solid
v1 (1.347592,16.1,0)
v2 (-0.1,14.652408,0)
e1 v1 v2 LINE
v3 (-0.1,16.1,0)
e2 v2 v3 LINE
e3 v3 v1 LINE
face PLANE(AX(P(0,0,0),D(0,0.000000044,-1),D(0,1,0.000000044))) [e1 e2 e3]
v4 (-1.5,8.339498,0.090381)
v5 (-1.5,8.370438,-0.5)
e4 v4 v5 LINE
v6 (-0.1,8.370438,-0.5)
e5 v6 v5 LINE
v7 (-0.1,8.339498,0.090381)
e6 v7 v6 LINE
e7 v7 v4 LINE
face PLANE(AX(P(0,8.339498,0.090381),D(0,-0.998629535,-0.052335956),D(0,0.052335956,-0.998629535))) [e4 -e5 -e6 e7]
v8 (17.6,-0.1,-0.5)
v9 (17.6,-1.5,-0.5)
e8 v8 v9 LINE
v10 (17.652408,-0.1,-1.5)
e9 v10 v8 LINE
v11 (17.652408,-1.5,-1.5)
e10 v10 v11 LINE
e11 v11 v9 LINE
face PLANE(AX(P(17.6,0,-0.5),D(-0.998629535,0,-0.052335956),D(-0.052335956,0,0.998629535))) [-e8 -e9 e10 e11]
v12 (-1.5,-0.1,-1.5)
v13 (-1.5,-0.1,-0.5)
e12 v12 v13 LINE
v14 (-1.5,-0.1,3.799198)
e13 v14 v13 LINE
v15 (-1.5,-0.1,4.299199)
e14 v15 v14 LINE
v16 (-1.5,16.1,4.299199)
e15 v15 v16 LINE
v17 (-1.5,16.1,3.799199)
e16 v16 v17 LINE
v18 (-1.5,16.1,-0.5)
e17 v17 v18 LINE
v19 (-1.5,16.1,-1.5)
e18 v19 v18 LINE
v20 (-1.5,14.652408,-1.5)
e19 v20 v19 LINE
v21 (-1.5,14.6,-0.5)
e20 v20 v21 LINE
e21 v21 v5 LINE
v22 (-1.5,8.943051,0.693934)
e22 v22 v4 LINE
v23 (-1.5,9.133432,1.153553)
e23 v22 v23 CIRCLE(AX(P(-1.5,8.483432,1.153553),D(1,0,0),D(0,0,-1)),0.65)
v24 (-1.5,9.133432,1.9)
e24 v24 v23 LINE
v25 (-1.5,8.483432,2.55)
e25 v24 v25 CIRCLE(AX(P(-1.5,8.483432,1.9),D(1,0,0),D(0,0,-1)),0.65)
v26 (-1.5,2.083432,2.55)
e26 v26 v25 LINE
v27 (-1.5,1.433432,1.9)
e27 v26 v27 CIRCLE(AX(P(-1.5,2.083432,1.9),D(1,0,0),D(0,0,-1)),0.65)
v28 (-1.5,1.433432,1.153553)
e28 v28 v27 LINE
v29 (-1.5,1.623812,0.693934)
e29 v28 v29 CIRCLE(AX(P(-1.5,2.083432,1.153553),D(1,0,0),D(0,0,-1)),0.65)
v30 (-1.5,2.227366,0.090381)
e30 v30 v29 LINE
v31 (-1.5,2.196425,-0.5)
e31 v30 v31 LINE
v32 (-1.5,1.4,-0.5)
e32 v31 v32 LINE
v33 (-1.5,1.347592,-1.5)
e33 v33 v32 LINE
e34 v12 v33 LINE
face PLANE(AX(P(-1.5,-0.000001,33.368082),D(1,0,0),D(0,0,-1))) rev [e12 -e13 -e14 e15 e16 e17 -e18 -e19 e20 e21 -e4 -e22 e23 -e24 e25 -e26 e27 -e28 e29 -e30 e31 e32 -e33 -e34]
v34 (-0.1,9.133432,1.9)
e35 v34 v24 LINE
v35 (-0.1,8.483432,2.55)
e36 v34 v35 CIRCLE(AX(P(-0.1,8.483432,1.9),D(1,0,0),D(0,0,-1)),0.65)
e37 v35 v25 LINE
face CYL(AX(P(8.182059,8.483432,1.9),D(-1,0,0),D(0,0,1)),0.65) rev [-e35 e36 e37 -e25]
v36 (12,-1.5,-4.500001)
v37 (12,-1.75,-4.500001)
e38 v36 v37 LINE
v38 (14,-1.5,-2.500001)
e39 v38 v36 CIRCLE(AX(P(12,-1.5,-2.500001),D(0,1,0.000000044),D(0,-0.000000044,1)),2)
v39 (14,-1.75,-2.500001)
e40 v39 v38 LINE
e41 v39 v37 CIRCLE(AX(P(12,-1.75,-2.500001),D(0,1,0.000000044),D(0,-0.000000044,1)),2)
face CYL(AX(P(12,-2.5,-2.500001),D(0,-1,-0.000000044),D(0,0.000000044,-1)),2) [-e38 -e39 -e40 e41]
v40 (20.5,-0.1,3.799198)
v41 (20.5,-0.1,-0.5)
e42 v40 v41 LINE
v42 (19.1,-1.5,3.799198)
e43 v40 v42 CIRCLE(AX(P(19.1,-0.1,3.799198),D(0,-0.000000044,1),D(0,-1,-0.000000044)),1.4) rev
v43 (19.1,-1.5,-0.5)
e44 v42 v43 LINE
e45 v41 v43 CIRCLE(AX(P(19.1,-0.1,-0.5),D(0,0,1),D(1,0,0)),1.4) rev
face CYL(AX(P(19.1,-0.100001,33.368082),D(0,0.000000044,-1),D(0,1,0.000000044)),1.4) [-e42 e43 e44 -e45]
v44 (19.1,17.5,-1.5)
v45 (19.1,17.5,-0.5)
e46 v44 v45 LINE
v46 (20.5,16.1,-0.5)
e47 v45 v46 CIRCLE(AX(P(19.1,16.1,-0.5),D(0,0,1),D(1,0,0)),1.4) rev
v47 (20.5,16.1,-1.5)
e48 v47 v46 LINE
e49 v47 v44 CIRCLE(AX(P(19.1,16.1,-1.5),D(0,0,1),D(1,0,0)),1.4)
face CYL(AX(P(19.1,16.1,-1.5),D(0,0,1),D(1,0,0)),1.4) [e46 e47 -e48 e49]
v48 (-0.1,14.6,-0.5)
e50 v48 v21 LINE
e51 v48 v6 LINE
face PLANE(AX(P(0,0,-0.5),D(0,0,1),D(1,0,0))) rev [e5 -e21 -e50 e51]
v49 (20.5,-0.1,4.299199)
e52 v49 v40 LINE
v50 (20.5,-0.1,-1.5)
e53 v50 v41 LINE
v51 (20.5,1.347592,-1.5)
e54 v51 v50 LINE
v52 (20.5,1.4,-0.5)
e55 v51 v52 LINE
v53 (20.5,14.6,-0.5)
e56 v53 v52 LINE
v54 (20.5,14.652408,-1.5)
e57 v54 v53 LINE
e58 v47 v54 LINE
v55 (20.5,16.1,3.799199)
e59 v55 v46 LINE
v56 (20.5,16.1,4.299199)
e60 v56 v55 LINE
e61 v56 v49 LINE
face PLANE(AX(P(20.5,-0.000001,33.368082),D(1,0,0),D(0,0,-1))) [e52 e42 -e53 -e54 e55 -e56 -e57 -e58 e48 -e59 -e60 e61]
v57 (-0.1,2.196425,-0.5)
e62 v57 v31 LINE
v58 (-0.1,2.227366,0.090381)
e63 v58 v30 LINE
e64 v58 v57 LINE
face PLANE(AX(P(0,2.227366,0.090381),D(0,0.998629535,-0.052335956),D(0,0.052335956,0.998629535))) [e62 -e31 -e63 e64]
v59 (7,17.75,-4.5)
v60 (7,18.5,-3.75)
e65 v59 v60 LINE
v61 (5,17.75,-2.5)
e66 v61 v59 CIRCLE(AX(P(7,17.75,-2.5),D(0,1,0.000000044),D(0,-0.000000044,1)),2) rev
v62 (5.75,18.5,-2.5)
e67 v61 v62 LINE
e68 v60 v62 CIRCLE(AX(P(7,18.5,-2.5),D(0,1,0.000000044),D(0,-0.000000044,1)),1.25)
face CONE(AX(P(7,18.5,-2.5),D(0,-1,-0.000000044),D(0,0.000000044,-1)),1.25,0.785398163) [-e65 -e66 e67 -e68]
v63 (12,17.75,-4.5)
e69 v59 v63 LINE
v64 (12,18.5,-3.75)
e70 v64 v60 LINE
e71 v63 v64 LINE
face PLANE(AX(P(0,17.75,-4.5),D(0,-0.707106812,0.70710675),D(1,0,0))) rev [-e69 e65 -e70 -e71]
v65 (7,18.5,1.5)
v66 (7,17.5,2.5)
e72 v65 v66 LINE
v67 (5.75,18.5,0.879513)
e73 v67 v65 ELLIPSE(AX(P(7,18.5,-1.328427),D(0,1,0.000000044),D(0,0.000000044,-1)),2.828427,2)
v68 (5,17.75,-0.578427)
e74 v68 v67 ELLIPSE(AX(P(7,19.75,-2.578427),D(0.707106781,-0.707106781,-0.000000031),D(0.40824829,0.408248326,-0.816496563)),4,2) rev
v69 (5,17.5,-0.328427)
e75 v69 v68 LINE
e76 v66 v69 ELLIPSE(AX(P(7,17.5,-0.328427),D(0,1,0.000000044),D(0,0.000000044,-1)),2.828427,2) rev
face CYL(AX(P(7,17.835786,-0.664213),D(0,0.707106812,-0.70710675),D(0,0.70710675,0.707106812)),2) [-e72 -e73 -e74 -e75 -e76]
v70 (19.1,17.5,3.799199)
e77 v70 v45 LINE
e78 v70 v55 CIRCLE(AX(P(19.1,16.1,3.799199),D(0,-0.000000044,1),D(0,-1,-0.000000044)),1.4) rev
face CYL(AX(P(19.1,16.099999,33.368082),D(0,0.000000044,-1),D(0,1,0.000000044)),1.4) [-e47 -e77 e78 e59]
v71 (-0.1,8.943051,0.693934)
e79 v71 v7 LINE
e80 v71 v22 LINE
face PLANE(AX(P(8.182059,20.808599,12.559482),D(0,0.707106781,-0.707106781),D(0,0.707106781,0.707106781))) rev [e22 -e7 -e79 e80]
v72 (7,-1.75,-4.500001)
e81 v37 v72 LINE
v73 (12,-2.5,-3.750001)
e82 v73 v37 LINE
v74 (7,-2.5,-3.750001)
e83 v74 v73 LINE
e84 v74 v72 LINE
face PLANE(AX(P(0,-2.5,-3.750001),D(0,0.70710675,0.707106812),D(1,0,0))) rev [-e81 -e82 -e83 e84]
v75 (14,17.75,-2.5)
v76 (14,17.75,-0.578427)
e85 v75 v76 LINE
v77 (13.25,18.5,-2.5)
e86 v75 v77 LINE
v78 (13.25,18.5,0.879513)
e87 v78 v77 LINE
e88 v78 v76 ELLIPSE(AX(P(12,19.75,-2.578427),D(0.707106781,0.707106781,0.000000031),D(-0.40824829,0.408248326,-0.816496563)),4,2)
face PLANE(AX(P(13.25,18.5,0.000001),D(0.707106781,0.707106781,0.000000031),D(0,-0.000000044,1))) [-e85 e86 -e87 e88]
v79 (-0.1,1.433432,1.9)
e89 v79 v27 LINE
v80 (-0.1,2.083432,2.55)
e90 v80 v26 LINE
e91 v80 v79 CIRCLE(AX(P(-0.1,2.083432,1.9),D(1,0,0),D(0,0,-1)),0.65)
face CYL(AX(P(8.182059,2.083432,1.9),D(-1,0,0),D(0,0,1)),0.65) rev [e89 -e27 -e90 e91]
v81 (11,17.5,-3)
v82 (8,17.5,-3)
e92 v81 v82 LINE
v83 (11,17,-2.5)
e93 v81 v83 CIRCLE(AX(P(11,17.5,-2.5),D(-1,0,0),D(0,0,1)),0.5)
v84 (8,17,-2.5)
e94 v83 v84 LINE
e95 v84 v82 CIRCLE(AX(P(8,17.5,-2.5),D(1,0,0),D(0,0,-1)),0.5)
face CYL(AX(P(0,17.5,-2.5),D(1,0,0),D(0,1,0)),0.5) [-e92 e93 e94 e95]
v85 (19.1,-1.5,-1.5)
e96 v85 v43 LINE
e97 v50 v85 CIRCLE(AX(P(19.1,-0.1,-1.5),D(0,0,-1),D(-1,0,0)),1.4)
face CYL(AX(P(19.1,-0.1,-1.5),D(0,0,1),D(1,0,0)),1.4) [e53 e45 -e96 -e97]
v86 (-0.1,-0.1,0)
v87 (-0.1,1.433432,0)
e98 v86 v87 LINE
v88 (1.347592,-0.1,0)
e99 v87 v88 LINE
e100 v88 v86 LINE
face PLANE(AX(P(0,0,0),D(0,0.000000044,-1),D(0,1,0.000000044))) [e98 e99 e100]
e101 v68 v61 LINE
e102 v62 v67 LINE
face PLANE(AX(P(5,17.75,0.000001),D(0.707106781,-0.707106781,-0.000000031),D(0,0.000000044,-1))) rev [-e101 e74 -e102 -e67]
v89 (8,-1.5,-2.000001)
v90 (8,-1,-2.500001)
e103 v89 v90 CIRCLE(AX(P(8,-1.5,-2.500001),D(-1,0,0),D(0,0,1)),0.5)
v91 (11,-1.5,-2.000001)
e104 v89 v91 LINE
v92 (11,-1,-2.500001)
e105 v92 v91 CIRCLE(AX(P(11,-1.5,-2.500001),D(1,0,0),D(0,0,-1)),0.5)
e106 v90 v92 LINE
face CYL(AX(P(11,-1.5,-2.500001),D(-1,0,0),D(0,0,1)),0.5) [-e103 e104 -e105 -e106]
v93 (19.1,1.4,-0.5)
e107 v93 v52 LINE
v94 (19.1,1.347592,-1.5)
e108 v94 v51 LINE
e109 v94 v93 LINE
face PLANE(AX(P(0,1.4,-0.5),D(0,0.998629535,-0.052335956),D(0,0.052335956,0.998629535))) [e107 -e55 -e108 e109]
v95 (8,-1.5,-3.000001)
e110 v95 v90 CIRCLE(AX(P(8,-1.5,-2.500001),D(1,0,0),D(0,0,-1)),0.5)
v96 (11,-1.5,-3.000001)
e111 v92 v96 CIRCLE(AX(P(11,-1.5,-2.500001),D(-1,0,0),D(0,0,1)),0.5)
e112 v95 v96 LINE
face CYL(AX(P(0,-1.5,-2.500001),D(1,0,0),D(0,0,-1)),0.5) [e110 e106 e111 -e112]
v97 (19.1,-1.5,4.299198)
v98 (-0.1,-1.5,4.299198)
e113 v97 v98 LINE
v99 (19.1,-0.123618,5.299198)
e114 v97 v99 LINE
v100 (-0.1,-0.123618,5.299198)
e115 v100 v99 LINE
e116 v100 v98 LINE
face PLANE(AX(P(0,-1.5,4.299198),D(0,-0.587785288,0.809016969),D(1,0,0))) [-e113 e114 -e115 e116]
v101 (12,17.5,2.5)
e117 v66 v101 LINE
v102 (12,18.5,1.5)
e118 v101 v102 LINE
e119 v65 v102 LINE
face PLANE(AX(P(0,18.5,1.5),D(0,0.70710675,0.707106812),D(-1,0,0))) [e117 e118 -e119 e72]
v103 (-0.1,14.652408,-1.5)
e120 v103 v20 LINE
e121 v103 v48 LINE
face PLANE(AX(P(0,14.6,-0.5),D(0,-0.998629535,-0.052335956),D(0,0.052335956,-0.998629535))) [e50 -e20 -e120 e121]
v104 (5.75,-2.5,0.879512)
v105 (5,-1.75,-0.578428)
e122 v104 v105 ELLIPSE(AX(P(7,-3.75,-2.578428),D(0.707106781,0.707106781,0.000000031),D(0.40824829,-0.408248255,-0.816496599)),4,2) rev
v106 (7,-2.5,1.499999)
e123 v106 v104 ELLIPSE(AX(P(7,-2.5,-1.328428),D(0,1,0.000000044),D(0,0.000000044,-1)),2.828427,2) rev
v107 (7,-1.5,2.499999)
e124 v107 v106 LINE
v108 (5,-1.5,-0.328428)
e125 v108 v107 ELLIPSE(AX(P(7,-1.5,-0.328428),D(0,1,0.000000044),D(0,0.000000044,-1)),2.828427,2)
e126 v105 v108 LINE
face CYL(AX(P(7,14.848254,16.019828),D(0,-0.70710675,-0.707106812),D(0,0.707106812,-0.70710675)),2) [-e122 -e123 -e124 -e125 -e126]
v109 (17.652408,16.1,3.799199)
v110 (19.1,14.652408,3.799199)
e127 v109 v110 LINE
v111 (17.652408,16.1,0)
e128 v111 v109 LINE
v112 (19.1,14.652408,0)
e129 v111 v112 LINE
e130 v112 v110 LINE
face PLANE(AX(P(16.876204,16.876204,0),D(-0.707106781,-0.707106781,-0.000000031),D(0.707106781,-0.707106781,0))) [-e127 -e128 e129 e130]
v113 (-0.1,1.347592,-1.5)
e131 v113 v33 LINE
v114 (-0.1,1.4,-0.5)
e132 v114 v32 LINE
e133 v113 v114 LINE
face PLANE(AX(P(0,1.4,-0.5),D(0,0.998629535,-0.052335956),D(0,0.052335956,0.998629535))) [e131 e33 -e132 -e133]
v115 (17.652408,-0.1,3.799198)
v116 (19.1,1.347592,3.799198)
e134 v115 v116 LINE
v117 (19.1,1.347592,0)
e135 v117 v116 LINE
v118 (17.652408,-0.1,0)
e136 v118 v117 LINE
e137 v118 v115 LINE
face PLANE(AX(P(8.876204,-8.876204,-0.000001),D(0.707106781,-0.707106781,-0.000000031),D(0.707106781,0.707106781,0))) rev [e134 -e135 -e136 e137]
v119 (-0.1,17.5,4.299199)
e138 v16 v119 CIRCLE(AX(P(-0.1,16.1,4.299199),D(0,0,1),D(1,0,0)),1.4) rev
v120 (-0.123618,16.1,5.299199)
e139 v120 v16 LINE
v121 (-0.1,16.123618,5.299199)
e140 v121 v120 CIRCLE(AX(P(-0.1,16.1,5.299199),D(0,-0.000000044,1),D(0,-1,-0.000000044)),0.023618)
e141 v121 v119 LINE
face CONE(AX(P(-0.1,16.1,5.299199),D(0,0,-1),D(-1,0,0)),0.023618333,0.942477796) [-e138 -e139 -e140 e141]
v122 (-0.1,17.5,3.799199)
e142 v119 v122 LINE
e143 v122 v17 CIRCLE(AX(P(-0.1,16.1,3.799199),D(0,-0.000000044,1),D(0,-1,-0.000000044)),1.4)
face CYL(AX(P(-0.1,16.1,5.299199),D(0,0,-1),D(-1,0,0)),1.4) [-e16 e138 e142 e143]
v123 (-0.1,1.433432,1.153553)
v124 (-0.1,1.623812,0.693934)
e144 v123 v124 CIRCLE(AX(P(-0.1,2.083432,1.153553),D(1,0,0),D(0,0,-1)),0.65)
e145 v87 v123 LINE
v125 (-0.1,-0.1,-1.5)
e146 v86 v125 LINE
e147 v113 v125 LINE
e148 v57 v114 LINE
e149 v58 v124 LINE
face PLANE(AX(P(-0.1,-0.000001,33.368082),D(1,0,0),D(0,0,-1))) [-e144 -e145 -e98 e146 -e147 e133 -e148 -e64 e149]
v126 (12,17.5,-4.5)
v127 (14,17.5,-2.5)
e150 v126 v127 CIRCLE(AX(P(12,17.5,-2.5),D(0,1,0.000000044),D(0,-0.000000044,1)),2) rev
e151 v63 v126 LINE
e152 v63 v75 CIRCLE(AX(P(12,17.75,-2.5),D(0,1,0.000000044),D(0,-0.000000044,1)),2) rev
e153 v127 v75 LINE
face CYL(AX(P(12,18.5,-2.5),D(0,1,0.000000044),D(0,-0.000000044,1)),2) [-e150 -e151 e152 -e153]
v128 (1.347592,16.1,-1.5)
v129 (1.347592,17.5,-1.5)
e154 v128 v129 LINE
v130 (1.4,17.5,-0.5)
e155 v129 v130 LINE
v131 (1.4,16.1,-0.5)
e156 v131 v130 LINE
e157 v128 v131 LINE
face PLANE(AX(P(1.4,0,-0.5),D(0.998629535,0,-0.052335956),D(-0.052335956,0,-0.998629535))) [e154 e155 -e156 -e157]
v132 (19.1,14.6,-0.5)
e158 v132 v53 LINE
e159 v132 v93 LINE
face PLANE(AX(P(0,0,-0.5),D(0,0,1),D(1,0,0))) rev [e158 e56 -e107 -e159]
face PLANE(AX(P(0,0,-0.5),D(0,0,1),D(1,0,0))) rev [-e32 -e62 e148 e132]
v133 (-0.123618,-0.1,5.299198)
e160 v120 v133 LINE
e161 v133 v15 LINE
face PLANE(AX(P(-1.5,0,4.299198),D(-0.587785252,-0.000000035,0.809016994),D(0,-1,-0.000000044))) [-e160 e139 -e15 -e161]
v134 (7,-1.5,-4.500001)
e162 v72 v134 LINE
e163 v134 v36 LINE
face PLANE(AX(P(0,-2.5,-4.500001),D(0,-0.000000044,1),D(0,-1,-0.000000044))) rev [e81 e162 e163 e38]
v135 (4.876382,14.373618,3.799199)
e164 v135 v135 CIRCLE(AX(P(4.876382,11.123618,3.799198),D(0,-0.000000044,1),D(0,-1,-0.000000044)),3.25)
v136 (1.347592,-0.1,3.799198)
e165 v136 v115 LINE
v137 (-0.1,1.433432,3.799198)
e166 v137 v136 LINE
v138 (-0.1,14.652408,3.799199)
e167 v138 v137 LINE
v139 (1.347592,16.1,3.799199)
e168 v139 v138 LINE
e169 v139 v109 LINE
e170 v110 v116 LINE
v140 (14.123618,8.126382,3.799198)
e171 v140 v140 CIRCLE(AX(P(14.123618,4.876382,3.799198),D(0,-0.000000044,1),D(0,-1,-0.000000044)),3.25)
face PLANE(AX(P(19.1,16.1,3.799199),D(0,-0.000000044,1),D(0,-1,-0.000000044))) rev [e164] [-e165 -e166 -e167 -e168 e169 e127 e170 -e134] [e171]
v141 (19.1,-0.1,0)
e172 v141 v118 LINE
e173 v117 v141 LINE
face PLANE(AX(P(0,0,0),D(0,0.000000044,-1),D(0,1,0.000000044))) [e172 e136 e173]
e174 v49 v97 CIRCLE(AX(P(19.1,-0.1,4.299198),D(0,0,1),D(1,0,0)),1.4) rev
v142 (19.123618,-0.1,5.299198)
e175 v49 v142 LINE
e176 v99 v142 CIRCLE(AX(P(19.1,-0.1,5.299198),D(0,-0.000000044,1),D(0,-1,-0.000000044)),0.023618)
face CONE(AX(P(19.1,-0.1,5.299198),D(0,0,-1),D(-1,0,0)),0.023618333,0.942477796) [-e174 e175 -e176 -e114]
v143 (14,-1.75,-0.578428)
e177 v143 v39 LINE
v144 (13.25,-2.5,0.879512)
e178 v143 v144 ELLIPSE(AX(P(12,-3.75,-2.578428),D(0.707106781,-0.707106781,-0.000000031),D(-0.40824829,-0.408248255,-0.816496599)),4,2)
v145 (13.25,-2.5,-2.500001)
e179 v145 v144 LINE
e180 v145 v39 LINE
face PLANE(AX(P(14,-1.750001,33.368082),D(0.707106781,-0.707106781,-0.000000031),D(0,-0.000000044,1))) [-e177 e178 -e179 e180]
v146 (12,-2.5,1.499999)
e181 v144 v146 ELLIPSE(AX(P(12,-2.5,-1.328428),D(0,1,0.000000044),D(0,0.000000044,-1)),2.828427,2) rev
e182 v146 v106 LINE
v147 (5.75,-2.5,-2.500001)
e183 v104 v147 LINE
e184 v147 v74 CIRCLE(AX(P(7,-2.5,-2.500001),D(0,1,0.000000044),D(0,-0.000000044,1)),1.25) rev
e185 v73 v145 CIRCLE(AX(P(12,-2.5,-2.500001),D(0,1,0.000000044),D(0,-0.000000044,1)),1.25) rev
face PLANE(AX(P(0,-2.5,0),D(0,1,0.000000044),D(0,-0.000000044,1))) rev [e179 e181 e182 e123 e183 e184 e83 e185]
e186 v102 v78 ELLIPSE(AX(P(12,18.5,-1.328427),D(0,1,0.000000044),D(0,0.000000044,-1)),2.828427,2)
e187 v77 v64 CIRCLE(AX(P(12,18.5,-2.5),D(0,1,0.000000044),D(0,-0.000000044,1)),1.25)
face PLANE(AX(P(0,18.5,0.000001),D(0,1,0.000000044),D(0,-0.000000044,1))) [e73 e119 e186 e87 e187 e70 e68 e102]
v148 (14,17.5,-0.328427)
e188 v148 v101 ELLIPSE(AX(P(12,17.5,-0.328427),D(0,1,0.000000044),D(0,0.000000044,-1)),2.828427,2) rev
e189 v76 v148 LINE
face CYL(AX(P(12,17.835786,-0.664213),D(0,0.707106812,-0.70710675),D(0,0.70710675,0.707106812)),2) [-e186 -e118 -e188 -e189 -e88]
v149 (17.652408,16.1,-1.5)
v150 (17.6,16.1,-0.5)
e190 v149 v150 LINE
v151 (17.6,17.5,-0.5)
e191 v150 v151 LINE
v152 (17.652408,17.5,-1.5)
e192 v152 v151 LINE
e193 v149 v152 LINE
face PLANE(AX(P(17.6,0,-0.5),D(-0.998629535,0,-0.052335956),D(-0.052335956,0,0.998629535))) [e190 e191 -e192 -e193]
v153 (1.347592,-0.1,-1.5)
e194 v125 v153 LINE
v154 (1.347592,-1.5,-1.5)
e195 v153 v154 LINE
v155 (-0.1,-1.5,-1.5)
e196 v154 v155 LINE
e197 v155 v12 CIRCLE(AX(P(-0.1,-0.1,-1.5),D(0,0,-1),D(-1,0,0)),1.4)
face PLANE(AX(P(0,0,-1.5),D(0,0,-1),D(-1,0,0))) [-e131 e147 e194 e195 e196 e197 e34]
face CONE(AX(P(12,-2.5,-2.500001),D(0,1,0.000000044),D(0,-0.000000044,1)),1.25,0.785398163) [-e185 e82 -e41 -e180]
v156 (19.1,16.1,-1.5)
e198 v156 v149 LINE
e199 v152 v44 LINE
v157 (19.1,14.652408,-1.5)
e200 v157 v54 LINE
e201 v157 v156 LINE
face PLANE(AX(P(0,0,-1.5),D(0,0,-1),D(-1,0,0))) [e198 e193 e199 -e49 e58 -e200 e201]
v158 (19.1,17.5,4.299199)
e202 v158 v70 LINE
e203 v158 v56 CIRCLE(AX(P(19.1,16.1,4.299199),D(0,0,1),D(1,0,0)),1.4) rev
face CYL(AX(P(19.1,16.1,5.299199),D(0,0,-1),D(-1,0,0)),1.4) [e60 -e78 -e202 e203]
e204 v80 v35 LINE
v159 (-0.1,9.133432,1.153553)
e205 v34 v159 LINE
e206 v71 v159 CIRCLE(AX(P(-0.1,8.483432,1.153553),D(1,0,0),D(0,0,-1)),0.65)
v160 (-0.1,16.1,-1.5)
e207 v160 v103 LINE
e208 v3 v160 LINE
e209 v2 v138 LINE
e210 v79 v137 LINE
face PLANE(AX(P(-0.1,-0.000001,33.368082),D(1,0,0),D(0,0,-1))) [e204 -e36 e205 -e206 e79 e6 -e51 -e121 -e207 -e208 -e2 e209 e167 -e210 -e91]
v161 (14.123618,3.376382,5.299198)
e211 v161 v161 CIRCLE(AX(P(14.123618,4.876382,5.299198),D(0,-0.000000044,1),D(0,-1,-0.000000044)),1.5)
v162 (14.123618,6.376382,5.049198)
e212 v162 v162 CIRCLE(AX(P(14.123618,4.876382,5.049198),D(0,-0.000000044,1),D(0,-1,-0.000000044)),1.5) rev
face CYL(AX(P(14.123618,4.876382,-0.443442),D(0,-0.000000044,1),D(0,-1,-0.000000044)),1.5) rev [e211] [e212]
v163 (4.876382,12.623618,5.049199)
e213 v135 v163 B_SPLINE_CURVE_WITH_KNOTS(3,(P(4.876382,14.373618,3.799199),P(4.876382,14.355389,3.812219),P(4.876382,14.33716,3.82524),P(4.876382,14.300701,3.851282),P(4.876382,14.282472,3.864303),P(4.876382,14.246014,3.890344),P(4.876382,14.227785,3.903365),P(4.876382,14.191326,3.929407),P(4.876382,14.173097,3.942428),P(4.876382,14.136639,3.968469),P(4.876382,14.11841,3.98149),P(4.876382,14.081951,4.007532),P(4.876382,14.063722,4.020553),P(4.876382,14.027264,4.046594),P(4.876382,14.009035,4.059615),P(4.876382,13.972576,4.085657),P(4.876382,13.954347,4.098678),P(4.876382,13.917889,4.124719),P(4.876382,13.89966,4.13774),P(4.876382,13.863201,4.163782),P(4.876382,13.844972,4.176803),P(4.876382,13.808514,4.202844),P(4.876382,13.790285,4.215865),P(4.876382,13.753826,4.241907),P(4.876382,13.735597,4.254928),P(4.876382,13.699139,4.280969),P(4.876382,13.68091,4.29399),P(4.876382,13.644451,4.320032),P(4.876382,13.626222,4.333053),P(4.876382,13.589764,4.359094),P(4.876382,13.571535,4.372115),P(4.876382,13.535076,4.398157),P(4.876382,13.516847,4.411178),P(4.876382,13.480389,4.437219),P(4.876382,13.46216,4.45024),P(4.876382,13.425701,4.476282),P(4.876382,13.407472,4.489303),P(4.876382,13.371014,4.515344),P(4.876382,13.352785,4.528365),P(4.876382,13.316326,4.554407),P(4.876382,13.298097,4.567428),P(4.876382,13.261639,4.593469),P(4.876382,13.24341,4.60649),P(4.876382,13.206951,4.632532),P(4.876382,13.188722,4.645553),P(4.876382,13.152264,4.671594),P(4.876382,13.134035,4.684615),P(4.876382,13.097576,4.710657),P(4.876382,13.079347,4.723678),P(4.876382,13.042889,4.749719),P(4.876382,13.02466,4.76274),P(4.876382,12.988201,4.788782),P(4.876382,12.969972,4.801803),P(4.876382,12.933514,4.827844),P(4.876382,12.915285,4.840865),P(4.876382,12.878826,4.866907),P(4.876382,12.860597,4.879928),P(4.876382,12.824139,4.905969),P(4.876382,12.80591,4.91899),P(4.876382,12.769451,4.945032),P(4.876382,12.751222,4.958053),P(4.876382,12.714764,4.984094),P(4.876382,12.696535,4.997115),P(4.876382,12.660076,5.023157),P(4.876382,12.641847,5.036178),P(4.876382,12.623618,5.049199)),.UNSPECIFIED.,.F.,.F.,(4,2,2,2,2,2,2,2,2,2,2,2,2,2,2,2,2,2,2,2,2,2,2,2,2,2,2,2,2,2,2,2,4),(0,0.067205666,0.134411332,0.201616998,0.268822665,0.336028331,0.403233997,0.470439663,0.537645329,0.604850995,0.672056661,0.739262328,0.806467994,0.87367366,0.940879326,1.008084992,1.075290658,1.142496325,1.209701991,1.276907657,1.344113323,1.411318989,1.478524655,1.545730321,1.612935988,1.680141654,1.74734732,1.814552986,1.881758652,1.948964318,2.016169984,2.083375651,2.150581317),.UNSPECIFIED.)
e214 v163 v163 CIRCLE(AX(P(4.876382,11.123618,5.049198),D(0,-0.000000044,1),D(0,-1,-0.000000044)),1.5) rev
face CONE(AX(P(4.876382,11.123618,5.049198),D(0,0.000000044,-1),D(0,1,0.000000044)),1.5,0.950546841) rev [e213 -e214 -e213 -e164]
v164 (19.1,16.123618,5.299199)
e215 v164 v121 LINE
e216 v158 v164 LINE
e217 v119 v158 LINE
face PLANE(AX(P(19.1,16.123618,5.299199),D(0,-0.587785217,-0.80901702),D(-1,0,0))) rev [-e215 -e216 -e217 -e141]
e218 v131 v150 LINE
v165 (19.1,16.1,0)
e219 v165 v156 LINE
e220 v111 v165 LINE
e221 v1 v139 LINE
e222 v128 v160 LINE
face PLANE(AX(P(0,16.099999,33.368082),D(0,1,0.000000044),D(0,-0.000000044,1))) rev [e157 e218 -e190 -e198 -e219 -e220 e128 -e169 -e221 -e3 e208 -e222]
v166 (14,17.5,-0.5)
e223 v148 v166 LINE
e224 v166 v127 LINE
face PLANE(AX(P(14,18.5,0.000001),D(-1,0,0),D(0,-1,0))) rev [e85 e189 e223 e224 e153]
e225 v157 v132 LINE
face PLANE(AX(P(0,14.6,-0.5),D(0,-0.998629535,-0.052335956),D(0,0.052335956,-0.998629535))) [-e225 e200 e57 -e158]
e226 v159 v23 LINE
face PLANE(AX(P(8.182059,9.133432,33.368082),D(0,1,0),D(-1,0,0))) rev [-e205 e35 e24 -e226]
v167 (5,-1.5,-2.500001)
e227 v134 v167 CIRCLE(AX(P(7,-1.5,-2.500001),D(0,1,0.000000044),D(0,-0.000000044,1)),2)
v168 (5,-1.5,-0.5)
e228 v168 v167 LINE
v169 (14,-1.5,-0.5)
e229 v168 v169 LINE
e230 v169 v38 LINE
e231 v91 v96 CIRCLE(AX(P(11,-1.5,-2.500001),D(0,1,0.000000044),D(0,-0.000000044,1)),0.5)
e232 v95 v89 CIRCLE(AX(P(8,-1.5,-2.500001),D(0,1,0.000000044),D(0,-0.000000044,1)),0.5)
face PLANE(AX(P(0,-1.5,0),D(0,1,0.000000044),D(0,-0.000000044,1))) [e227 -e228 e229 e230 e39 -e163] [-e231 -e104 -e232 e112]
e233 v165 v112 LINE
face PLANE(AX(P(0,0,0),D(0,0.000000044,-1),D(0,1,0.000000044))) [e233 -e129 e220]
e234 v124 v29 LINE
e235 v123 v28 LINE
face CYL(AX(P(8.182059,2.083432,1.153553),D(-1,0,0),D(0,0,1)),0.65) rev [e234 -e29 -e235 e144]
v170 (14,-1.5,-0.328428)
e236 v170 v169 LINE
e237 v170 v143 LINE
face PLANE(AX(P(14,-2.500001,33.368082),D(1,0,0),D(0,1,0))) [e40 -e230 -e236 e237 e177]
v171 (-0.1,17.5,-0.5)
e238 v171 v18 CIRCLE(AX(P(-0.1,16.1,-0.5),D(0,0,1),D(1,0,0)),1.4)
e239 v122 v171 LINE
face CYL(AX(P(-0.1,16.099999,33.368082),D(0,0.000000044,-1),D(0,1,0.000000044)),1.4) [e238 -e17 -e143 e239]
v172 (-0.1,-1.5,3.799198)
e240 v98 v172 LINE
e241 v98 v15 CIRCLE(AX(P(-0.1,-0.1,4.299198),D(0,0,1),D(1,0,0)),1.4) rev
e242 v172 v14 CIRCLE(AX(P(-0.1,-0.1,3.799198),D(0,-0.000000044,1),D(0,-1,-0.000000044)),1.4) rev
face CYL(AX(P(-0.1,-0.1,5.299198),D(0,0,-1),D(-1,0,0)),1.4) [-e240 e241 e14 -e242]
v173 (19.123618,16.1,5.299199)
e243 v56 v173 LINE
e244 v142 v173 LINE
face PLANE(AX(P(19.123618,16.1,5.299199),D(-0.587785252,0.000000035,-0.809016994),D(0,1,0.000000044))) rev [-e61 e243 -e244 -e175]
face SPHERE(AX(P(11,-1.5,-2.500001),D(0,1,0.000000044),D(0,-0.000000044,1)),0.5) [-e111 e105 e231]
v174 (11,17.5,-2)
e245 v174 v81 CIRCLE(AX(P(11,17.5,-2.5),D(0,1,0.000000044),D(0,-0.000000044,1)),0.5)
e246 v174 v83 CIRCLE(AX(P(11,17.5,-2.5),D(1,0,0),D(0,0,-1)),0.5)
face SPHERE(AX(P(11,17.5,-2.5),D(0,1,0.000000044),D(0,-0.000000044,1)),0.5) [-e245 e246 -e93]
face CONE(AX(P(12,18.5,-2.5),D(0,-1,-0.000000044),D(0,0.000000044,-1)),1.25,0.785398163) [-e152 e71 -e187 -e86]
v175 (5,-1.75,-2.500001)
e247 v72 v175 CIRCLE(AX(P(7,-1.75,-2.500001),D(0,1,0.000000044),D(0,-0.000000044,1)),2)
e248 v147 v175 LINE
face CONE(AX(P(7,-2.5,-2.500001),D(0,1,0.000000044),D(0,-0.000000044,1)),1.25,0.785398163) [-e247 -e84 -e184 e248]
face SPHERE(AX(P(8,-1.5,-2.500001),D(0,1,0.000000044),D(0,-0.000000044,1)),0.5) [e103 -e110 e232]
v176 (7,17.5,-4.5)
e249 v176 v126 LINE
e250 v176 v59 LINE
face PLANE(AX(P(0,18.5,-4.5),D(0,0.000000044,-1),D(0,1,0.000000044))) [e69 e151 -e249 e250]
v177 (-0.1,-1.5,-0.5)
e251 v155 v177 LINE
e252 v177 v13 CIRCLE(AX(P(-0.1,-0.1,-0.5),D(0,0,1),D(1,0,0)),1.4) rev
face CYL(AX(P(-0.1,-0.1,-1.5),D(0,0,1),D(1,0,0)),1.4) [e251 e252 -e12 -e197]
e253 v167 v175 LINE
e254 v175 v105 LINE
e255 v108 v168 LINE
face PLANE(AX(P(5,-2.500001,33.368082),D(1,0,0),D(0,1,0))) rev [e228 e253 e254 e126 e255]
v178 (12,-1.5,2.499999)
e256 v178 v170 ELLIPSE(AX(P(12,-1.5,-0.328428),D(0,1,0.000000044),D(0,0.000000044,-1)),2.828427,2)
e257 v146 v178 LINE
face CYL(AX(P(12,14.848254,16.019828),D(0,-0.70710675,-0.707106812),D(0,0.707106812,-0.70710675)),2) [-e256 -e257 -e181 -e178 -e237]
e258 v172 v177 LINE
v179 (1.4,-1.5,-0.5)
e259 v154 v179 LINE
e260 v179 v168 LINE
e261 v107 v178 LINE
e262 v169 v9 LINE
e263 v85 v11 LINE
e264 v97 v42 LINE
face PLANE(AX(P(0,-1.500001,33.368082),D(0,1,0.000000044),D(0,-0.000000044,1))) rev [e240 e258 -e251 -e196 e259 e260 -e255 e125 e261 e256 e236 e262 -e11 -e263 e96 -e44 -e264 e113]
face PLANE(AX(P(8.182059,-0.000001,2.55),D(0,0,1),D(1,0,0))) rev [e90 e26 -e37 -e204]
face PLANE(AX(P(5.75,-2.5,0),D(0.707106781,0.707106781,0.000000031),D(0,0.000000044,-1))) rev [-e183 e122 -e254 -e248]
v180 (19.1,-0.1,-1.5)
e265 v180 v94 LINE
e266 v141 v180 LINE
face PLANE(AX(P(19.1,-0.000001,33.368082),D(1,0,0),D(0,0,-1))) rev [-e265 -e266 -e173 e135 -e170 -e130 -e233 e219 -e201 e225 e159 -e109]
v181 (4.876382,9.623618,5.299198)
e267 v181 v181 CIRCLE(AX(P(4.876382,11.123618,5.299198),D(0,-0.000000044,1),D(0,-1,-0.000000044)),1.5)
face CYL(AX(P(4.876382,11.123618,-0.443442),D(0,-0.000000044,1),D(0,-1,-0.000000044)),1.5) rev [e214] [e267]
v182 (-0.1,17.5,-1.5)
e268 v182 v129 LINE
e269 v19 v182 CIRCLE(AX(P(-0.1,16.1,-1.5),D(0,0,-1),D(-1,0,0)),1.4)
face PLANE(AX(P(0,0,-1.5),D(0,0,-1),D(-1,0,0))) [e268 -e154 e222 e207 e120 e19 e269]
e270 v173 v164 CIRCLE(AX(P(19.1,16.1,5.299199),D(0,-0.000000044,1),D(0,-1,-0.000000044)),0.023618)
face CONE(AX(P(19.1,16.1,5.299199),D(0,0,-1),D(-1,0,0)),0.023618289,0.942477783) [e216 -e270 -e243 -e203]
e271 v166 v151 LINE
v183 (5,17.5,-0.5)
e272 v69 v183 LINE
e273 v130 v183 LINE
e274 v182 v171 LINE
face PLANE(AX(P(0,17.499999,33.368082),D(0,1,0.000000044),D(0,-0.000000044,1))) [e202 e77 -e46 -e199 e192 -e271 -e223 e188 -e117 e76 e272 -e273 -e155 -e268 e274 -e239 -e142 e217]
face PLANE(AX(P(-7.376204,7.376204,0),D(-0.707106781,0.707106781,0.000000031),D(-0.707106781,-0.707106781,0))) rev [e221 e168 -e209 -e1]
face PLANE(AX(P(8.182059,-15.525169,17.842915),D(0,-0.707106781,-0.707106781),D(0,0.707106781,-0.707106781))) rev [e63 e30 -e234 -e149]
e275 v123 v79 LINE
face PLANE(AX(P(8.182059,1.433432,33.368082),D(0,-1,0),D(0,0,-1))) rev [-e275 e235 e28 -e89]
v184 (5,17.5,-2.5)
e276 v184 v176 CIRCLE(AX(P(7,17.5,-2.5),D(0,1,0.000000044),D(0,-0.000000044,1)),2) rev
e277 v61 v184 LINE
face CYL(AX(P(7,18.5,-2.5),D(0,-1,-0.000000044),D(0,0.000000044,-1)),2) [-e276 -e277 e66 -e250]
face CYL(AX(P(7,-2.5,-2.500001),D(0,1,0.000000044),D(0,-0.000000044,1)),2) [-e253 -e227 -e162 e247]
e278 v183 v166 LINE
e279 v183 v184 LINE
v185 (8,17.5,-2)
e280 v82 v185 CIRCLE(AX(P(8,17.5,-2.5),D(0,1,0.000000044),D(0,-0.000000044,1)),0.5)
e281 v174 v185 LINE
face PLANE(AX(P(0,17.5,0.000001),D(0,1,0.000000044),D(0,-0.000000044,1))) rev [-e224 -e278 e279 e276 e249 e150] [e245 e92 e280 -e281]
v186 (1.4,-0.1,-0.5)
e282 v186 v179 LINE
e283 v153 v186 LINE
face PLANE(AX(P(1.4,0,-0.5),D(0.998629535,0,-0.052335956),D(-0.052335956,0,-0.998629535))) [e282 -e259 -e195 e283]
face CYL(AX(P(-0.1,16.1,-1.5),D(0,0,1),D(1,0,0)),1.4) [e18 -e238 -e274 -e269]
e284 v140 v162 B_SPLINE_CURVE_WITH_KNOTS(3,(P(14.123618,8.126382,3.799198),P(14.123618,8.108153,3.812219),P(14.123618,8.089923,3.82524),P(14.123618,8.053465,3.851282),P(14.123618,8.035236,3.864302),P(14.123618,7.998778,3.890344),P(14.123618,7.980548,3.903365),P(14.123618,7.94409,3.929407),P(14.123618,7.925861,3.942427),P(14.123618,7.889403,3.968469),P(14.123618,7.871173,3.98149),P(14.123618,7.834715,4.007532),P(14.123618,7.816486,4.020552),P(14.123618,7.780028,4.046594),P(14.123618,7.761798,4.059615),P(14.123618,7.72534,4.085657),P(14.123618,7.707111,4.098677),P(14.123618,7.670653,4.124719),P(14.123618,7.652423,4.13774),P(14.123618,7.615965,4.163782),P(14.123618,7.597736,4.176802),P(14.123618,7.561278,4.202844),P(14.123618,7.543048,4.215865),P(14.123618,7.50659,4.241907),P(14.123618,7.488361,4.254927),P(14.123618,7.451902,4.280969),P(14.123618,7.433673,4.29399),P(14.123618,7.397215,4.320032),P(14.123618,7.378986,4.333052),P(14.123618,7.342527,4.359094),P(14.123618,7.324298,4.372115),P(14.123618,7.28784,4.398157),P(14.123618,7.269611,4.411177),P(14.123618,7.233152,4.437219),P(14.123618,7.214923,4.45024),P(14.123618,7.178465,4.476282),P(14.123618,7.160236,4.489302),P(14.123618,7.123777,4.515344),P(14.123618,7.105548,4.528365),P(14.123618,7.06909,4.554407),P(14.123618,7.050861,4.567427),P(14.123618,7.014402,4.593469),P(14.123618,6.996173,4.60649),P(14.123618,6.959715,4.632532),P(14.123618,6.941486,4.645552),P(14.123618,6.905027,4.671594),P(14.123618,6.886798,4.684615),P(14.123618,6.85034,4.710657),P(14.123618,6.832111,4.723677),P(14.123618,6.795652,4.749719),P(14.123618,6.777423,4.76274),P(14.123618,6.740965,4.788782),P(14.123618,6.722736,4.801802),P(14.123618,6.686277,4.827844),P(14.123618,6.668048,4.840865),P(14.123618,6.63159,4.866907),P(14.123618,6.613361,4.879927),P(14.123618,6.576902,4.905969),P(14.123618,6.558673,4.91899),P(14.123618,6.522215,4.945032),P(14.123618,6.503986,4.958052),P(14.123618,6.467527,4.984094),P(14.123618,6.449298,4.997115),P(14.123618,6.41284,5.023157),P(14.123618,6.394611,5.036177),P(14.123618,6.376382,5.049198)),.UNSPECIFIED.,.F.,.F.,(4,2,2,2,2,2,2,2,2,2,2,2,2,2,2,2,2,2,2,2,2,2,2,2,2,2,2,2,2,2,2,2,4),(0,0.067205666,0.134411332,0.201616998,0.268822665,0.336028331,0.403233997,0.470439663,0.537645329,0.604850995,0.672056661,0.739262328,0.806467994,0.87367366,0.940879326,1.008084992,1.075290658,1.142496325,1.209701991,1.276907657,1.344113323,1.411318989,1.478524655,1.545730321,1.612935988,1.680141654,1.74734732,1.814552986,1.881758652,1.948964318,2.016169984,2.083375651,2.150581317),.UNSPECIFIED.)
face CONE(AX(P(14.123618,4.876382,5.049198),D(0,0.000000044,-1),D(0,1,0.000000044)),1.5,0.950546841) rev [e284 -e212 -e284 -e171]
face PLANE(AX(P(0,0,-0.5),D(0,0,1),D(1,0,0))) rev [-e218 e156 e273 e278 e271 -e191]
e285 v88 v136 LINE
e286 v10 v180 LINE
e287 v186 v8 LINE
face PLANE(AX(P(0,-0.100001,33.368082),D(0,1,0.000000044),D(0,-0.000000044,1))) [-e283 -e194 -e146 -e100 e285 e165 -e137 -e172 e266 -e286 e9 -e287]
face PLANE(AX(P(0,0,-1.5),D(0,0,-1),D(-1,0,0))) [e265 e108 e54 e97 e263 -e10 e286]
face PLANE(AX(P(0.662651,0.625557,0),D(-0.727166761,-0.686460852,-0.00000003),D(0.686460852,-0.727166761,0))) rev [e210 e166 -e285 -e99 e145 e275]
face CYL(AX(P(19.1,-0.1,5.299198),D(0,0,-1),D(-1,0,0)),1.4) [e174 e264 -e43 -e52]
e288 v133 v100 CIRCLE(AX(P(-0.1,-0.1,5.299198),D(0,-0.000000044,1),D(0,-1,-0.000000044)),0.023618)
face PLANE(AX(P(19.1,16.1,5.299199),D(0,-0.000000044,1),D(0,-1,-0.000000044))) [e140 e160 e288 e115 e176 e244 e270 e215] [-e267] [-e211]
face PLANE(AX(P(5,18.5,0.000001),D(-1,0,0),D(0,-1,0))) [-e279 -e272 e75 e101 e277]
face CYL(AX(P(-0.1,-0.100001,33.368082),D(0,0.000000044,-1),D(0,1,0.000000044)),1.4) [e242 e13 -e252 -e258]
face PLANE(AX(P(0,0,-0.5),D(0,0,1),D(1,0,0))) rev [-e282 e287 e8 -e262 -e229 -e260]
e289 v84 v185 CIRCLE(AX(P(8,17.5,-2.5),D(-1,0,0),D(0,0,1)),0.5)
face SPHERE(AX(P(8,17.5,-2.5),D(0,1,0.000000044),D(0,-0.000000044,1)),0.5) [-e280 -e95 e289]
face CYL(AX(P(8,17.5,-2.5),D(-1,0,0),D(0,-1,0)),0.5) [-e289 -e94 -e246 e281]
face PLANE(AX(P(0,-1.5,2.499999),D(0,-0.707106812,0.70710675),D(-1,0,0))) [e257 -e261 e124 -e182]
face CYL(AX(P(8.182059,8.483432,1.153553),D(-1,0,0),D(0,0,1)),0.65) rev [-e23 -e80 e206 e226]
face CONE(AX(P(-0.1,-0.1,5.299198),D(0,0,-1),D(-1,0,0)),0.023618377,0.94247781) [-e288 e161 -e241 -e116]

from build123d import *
from OCP.BRepAlgoAPI import BRepAlgoAPI_Cut
from OCP.TopTools import TopTools_ListOfShape
from OCP.BRepFilletAPI import BRepFilletAPI_MakeChamfer
from build123d.topology import SkipClean

# Parameters (mm, degrees)
WALLS_START            = -0.5
WALLS_DEPTH            = 4.299197948
BOTTOM_START           = 3.799199
BOTTOM_DEPTH           = 1.5
TABS_START             = 1
TABS_DEPTH             = 1
DRAFT_TABS_ANGLE       = 3
USB_HOLE_DEPTH         = 1.4
DRAFT1_ANGLE           = 3
DESQUISH_CHAMFER_SIZE  = 1
DESQUISH_CHAMFER_SIZE2 = 1.37638192
SUPPORTS_DEPTH         = 3.799198
SKETCH7_W              = 9
SKETCH7_H              = 7
BOSS_EXTRUDE1_DEPTH    = 1
BOSS_EXTRUDE2_START    = -19
SKETCH7_3_W            = 9
SKETCH7_3_H            = 7
BOSS_EXTRUDE2_DEPTH    = 1
BOSS_EXTRUDE3_DEPTH    = 0.5
BOSS_EXTRUDE4_START    = -18.5
BOSS_EXTRUDE4_DEPTH    = 0.5
FILLET2_R              = 2
FILLET1_R              = 0.5
CHAMFER1_SIZE          = 0.75
CHAMFER2_SIZE          = 1
FILLET3_R              = 2
SKETCH10_R             = 1.5
CUT_EXTRUDE1_DEPTH     = 1.5
CHAMFER3_SIZE          = 1.75
CHAMFER3_SIZE2         = 1.25


with BuildPart() as part:
    # walls: read off the stored shape, not the designer's step
    # walls outline → walls (new body)
    with BuildSketch(Plane.XY.offset(WALLS_START)):
        with BuildLine():
            ThreePointArc((20.5, 16.099999812), (20.089949494, 17.089949306), (19.1, 17.499999812))
            Line((19.1, 17.499999812), (-0.1, 17.499999812))
            ThreePointArc((-0.1, 17.499999812), (-1.089949494, 17.089949306), (-1.5, 16.099999812))
            Line((-1.5, 16.099999812), (-1.5, -0.100000188))
            ThreePointArc((-1.5, -0.100000188), (-1.089949494, -1.089949682), (-0.1, -1.500000188))
            Line((-0.1, -1.500000188), (19.1, -1.500000188))
            ThreePointArc((19.1, -1.500000188), (20.089949494, -1.089949682), (20.5, -0.100000188))
            Line((20.5, -0.100000188), (20.5, 16.099999812))
        make_face()
        Polygon((19.1, -0.100000019), (-0.1, -0.100000019), (-0.1, 16.1), (19.1, 16.099999981), align=None, mode=Mode.SUBTRACT)
    extrude(amount=WALLS_DEPTH)


with BuildPart() as bottom_tool:
    # Sketch1<6> → bottom (new body)
    with BuildSketch(Plane.XY.offset(BOTTOM_START)):
        with BuildLine():
            Line((-0.1, 17.5), (19.1, 17.5))
            ThreePointArc((19.1, 17.5), (20.089949494, 17.089949494), (20.5, 16.1))
            Line((20.5, 16.1), (20.5, -0.1))
            ThreePointArc((20.5, -0.1), (20.089949494, -1.089949494), (19.1, -1.5))
            Line((19.1, -1.5), (-0.1, -1.5))
            ThreePointArc((-0.1, -1.5), (-1.089949494, -1.089949494), (-1.5, -0.1))
            Line((-1.5, -0.1), (-1.5, 16.1))
            ThreePointArc((-1.5, 16.1), (-1.089949494, 17.089949494), (-0.1, 17.5))
        make_face()
    extrude(amount=BOTTOM_DEPTH)


with BuildPart() as part_1:
    add(part.part)


with BuildPart() as part_2:
    # bottom: joined with bottom_tool
    add(part_1.part.fuse(bottom_tool.part, tol=0.00001))

    # Sketch5 → tabs (add)
    with SkipClean():  # the faces are left unmerged after this step: merging them gives an invalid solid
        with BuildSketch(Plane(origin=(0, 0, -0.5), x_dir=(-1, 0, 0), z_dir=(0, 0, -1)).offset(TABS_START)):
            with BuildLine():
                ThreePointArc((-20.5, -0.1), (-20.089949494, -1.089949494), (-19.1, -1.5))
                Line((-19.1, -1.5), (-17.6, -1.5))
                Line((-17.6, -1.5), (-17.6, -0.1))
                Line((-17.6, -0.1), (-19.1, -0.1))
                Line((-19.1, -0.1), (-19.1, 1.4))
                Line((-19.1, 1.4), (-20.5, 1.4))
                Line((-20.5, 1.4), (-20.5, -0.1))
            make_face()
            with BuildLine():
                Line((0.1, -0.1), (-1.4, -0.1))
                Line((-1.4, -0.1), (-1.4, -1.5))
                Line((-1.4, -1.5), (0.1, -1.5))
                ThreePointArc((0.1, -1.5), (1.089949494, -1.089949494), (1.5, -0.1))
                Line((1.5, -0.1), (1.5, 1.4))
                Line((1.5, 1.4), (0.1, 1.4))
                Line((0.1, 1.4), (0.1, -0.1))
            make_face()
            with BuildLine():
                Line((-20.5, 14.6), (-19.1, 14.6))
                Line((-19.1, 14.6), (-19.1, 16.1))
                Line((-19.1, 16.1), (-17.6, 16.1))
                Line((-17.6, 16.1), (-17.6, 17.5))
                Line((-17.6, 17.5), (-19.1, 17.5))
                ThreePointArc((-19.1, 17.5), (-20.089949494, 17.089949494), (-20.5, 16.1))
                Line((-20.5, 16.1), (-20.5, 14.6))
            make_face()
            with BuildLine():
                Line((0.1, 16.1), (0.1, 14.6))
                Line((0.1, 14.6), (1.5, 14.6))
                Line((1.5, 14.6), (1.5, 16.1))
                ThreePointArc((1.5, 16.1), (1.089949494, 17.089949494), (0.1, 17.5))
                Line((0.1, 17.5), (-1.4, 17.5))
                Line((-1.4, 17.5), (-1.4, 16.1))
                Line((-1.4, 16.1), (0.1, 16.1))
            make_face()
        extrude(amount=-TABS_DEPTH)

    # draft tabs
    draft_tabs_faces = [part_2.faces().sort_by_distance(p)[0] for p in [
        (1.4, 16.8, -1),
        (19.8, 1.4, -1),
        (19.8, 14.6, -1),
        (1.4, -0.8, -1),
        (17.6, -0.8, -1),
        (17.6, 16.8, -1),
        (-0.8, 1.4, -1),
        (-0.8, 14.6, -1),
    ]]
    draft(draft_tabs_faces, Plane(origin=(0, 0, -0.5), x_dir=(-1, 0, 0), z_dir=(0, 0, -1)), DRAFT_TABS_ANGLE)

    # Sketch6 → usb hole (cut)
    with SkipClean():  # the faces are left unmerged after this step: merging them gives an invalid solid
        with BuildSketch(Plane.ZY.offset(1.5)):
            with BuildLine():
                Line((1.153553391, 1.43343172), (1.9, 1.43343172))
                ThreePointArc((1.9, 1.43343172), (2.359619408, 1.623812312), (2.55, 2.08343172))
                Line((2.55, 2.08343172), (2.55, 8.48343172))
                ThreePointArc((2.55, 8.48343172), (2.359619408, 8.943051128), (1.9, 9.13343172))
                Line((1.9, 9.13343172), (1.153553391, 9.13343172))
                ThreePointArc((1.153553391, 9.13343172), (0.90480916, 9.083953416), (0.693933983, 8.943051128))
                Line((0.693933983, 8.943051128), (0.090380592, 8.339497737))
                ThreePointArc((0.090380592, 8.339497737), (-0.050521696, 8.12862256), (-0.1, 7.879878329))
                Line((-0.1, 7.879878329), (-0.1, 5.29343172))
                Line((-0.1, 5.29343172), (-0.1, 5.27343172))
                Line((-0.1, 5.27343172), (-0.1, 2.686985111))
                ThreePointArc((-0.1, 2.686985111), (-0.050521696, 2.43824088), (0.090380592, 2.227365703))
                Line((0.090380592, 2.227365703), (0.693933983, 1.623812312))
                ThreePointArc((0.693933983, 1.623812312), (0.90480916, 1.482910024), (1.153553391, 1.43343172))
            make_face()
            with BuildLine():
                Line((-0.5, 2.227365703), (0.090380592, 2.227365703))
                ThreePointArc((0.090380592, 2.227365703), (-0.050521696, 2.43824088), (-0.1, 2.686985111))
                Line((-0.1, 2.686985111), (-0.1, 5.27343172))
                Line((-0.1, 5.27343172), (-0.1, 5.29343172))
                Line((-0.1, 5.29343172), (-0.1, 7.879878329))
                ThreePointArc((-0.1, 7.879878329), (-0.050521696, 8.12862256), (0.090380592, 8.339497737))
                Line((0.090380592, 8.339497737), (-0.5, 8.339497737))
                Line((-0.5, 8.339497737), (-0.5, 2.227365703))
            make_face()
        extrude(amount=-USB_HOLE_DEPTH, mode=Mode.SUBTRACT)

    # Draft1
    draft1_faces = [part_2.faces().sort_by_distance(p)[0] for p in [
        (-0.8, 8.339497737, -0.204809704),
        (-0.8, 2.227365703, -0.204809704),
    ]]
    draft(draft1_faces, Plane(origin=(0, 0, 0.090380592), x_dir=(0, -1, 0), z_dir=(0, 0, -1)), DRAFT1_ANGLE)

    # desquish chamfer: one chamfer whose edges measure the first distance from different faces: ONE call of the kernel's chamfer builder (chamfer() names one face for all edges)
    desquish_chamfer_edges_1 = [part_2.edges().sort_by_distance(p)[0] for p in [
        (-1.5, 8, 5.299199),
    ]]
    desquish_chamfer_side_1 = [part_2.faces().sort_by_distance(p)[0] for p in [
        (-1.5, 8.817703762, 2.795318179),
    ]]
    desquish_chamfer_edges_2 = [part_2.edges().sort_by_distance(p)[0] for p in [
        (9.5, -1.5, 5.299199),
    ]]
    desquish_chamfer_side_2 = [part_2.faces().sort_by_distance(p)[0] for p in [
        (9.5, -1.5, 4.549199),
    ]]
    desquish_chamfer_edges_3 = [part_2.edges().sort_by_distance(p)[0] for p in [
        (20.089949494, 17.089949494, 5.299199),
    ]]
    desquish_chamfer_side_3 = [part_2.faces().sort_by_distance(p)[0] for p in [
        (20.089949494, 17.089949494, 4.549199),
    ]]
    desquish_chamfer_edges_4 = [part_2.edges().sort_by_distance(p)[0] for p in [
        (9.5, 17.5, 5.299199),
    ]]
    desquish_chamfer_side_4 = [part_2.faces().sort_by_distance(p)[0] for p in [
        (9.5, 17.5, 4.549199),
    ]]
    desquish_chamfer_edges_5 = [part_2.edges().sort_by_distance(p)[0] for p in [
        (-1.089949494, 17.089949494, 5.299199),
    ]]
    desquish_chamfer_side_5 = [part_2.faces().sort_by_distance(p)[0] for p in [
        (-1.089949494, 17.089949494, 4.549199),
    ]]
    desquish_chamfer_edges_6 = [part_2.edges().sort_by_distance(p)[0] for p in [
        (-1.089949494, -1.089949494, 5.299199),
    ]]
    desquish_chamfer_side_6 = [part_2.faces().sort_by_distance(p)[0] for p in [
        (-1.089949494, -1.089949494, 4.549199),
    ]]
    desquish_chamfer_edges_7 = [part_2.edges().sort_by_distance(p)[0] for p in [
        (20.089949494, -1.089949494, 5.299199),
    ]]
    desquish_chamfer_side_7 = [part_2.faces().sort_by_distance(p)[0] for p in [
        (20.089949494, -1.089949494, 4.549199),
    ]]
    desquish_chamfer_edges_8 = [part_2.edges().sort_by_distance(p)[0] for p in [
        (20.5, 8, 5.299199),
    ]]
    desquish_chamfer_side_8 = [part_2.faces().sort_by_distance(p)[0] for p in [
        (20.5, 7.999999861, 2.399599246),
    ]]
    desquish_chamfer = BRepFilletAPI_MakeChamfer(part_2.part.solid().wrapped)
    for e in desquish_chamfer_edges_1:
        desquish_chamfer.Add(DESQUISH_CHAMFER_SIZE, DESQUISH_CHAMFER_SIZE2, e.wrapped, desquish_chamfer_side_1[0].wrapped)  # the first distance lies on this face
    for e in desquish_chamfer_edges_2:
        desquish_chamfer.Add(DESQUISH_CHAMFER_SIZE, DESQUISH_CHAMFER_SIZE2, e.wrapped, desquish_chamfer_side_2[0].wrapped)  # the first distance lies on this face
    for e in desquish_chamfer_edges_3:
        desquish_chamfer.Add(DESQUISH_CHAMFER_SIZE, DESQUISH_CHAMFER_SIZE2, e.wrapped, desquish_chamfer_side_3[0].wrapped)  # the first distance lies on this face
    for e in desquish_chamfer_edges_4:
        desquish_chamfer.Add(DESQUISH_CHAMFER_SIZE, DESQUISH_CHAMFER_SIZE2, e.wrapped, desquish_chamfer_side_4[0].wrapped)  # the first distance lies on this face
    for e in desquish_chamfer_edges_5:
        desquish_chamfer.Add(DESQUISH_CHAMFER_SIZE, DESQUISH_CHAMFER_SIZE2, e.wrapped, desquish_chamfer_side_5[0].wrapped)  # the first distance lies on this face
    for e in desquish_chamfer_edges_6:
        desquish_chamfer.Add(DESQUISH_CHAMFER_SIZE, DESQUISH_CHAMFER_SIZE2, e.wrapped, desquish_chamfer_side_6[0].wrapped)  # the first distance lies on this face
    for e in desquish_chamfer_edges_7:
        desquish_chamfer.Add(DESQUISH_CHAMFER_SIZE, DESQUISH_CHAMFER_SIZE2, e.wrapped, desquish_chamfer_side_7[0].wrapped)  # the first distance lies on this face
    for e in desquish_chamfer_edges_8:
        desquish_chamfer.Add(DESQUISH_CHAMFER_SIZE, DESQUISH_CHAMFER_SIZE2, e.wrapped, desquish_chamfer_side_8[0].wrapped)  # the first distance lies on this face
    add(Compound.cast(desquish_chamfer.Shape()), mode=Mode.REPLACE)

    # Sketch4 → supports (add)
    with SkipClean():  # the faces are left unmerged after this step: merging them gives an invalid solid
        with BuildSketch(Plane(origin=(0, -1.66e-07, 3.799197981), x_dir=(-1, 0, 0), z_dir=(-4.178627238637218e-15, 4.3711409000000035e-08, -0.9999999999999991))):
            Polygon((-19.1, 16.099999934), (-19.1, 14.652407714), (-17.652407779, 16.099999934), align=None)
            Polygon((0.1, 16.099999934), (-1.347592221, 16.099999934), (0.1, 14.652407714), align=None)
            Polygon((-19.1, 1.347592155), (-19.1, -0.100000066), (-17.652407779, -0.100000066), align=None)
            Polygon((0.1, 1.433431803), (-1.347592221, -0.100000066), (0.1, -0.100000066), (0.1, 1.347592155), align=None)
        extrude(amount=SUPPORTS_DEPTH)

    # Sketch7 → Boss-Extrude1 (add)
    with SkipClean():  # the faces are left unmerged after this step: merging them gives an invalid solid
        with BuildSketch(Plane(origin=(0, 17.499999978, 7.65e-07), x_dir=(1, 0, 0), z_dir=(0, 0.999999999999999, 4.371140900000003e-08))):
            with Locations((9.5, 1.000000765)):
                Rectangle(SKETCH7_W, SKETCH7_H)
        extrude(amount=BOSS_EXTRUDE1_DEPTH)

    # Sketch7<3> → Boss-Extrude2 (add)
    with SkipClean():  # the faces are left unmerged after this step: merging them gives an invalid solid
        with BuildSketch(Plane(origin=(0, 17.499999978, 7.65e-07), x_dir=(1, 0, 0), z_dir=(0, 0.999999999999999, 4.371140900000003e-08)).offset(BOSS_EXTRUDE2_START)):
            with Locations((9.5, 1.000000765)):
                Rectangle(SKETCH7_3_W, SKETCH7_3_H)
        extrude(amount=-BOSS_EXTRUDE2_DEPTH)

    # Sketch7<4> → Boss-Extrude3 (add)
    with SkipClean():  # the faces are left unmerged after this step: merging them gives an invalid solid
        with BuildSketch(Plane(origin=(0, 17.499999978, 7.65e-07), x_dir=(1, 0, 0), z_dir=(0, 0.999999999999999, 4.371140900000003e-08))):
            with BuildLine():
                Line((8, 3.000000765), (11, 3.000000765))
                ThreePointArc((11, 3.000000765), (11.5, 2.500000765), (11, 2.000000765))
                Line((11, 2.000000765), (8, 2.000000765))
                ThreePointArc((8, 2.000000765), (7.5, 2.500000765), (8, 3.000000765))
            make_face()
        extrude(amount=-BOSS_EXTRUDE3_DEPTH)

    # Sketch7<5> → Boss-Extrude4 (add)
    with SkipClean():  # the faces are left unmerged after this step: merging them gives an invalid solid
        with BuildSketch(Plane(origin=(0, 17.499999978, 7.65e-07), x_dir=(1, 0, 0), z_dir=(0, 0.999999999999999, 4.371140900000003e-08)).offset(BOSS_EXTRUDE4_START)):
            with BuildLine():
                Line((8, 3.000000765), (11, 3.000000765))
                ThreePointArc((11, 3.000000765), (11.5, 2.500000765), (11, 2.000000765))
                Line((11, 2.000000765), (8, 2.000000765))
                ThreePointArc((8, 2.000000765), (7.5, 2.500000765), (8, 3.000000765))
            make_face()
        extrude(amount=-BOSS_EXTRUDE4_DEPTH)

    # Fillet2
    fillet2_edges = [part_2.edges().sort_by_distance(p)[0] for p in [
        (5, 18.000000175, -4.499999978),
        (14, 18.000000175, -4.499999978),
        (5, -1.999999825, -4.500000852),
        (14, -1.999999825, -4.500000852),
    ]]
    fillet(fillet2_edges, radius=FILLET2_R)

    # Fillet1
    fillet1_edges = [part_2.edges().sort_by_distance(p)[0] for p in [
        (9.5, 17.000000109, -3.000000022),
        (11.5, 17.000000087, -2.500000022),
        (9.5, 17.000000066, -2.000000022),
        (9.5, -0.999999891, -3.000000809),
        (11.5, -0.999999913, -2.500000809),
        (9.5, -0.999999934, -2.000000809),
        (7.5, 17.000000087, -2.500000022),
        (7.5, -0.999999913, -2.500000809),
    ]]
    fillet(fillet1_edges, radius=FILLET1_R - 0.0001)  # a hair under: the kernel refuses the full size

    # Chamfer1
    chamfer1_edges = [part_2.edges().sort_by_distance(p)[0] for p in [
        (5, 18.499999978, 4.4e-08),
        (14, 18.499999978, 4.4e-08),
        (14, -2.500000022, -8.74e-07),
        (5, -2.500000022, -8.74e-07),
        (9.5, -2.499999825, -4.500000874),
        (13.414213562, -2.499999851, -3.914214437),
        (5.585786438, -2.499999851, -3.914214437),
        (9.5, 18.500000175, -4.499999956),
        (5.585786438, 18.500000149, -3.914213519),
        (13.414213562, 18.500000149, -3.914213519),
    ]]
    chamfer(chamfer1_edges, length=CHAMFER1_SIZE)

    # Chamfer2
    chamfer2_edges = [part_2.edges().sort_by_distance(p)[0] for p in [
        (9.5, -2.500000131, 2.499999126),
        (9.5, 18.499999869, 2.500000044),
    ]]
    chamfer(chamfer2_edges, length=CHAMFER2_SIZE - 0.0001)  # a hair under: the kernel refuses the full size

    # Fillet3
    # the kernel refuses this fillet: 2 mm, written as the material it takes off along each edge
    with BuildSketch(Plane(origin=(5, 2.03543362, 6.03553323), x_dir=(0, 0.7071068120951806, -0.707106750277913), z_dir=(0, -0.707106750277913, -0.7071068120951807))) as fillet3_piece_1_section:
        with BuildLine():
            CenterArc((FILLET3_R, FILLET3_R), FILLET3_R, 180, 90)
            Line((0, FILLET3_R), (0, 0))
            Line((0, 0), (FILLET3_R, 0))
        make_face()
    fillet3_piece_1 = extrude(amount=10.353411969, mode=Mode.PRIVATE)
    fillet3_piece_1 = split(fillet3_piece_1, bisect_by=Plane(origin=(5, -1.500000188, 6.03553323), z_dir=(0, -1, 0)), keep=Keep.TOP, mode=Mode.PRIVATE)
    with BuildSketch(Plane(origin=(14, 2.03543362, 6.03553323), x_dir=(-1, 0, 0), z_dir=(0, -0.707106750277913, -0.7071068120951807))) as fillet3_piece_2_section:
        with BuildLine():
            CenterArc((FILLET3_R, FILLET3_R), FILLET3_R, 180, 90)
            Line((0, FILLET3_R), (0, 0))
            Line((0, 0), (FILLET3_R, 0))
        make_face()
    fillet3_piece_2 = extrude(amount=10.353411969, mode=Mode.PRIVATE)
    fillet3_piece_2 = split(fillet3_piece_2, bisect_by=Plane(origin=(14, -1.500000188, 6.03553323), z_dir=(0, -1, 0)), keep=Keep.TOP, mode=Mode.PRIVATE)
    with BuildSketch(Plane(origin=(14, 13.964565808, 6.035533751), x_dir=(0, -0.7071067502779134, -0.7071068120951804), z_dir=(0, 0.7071068120951804, -0.7071067502779134))) as fillet3_piece_3_section:
        with BuildLine():
            CenterArc((FILLET3_R, FILLET3_R), FILLET3_R, 180, 90)
            Line((0, FILLET3_R), (0, 0))
            Line((0, 0), (FILLET3_R, 0))
        make_face()
    fillet3_piece_3 = extrude(amount=10.353411969, mode=Mode.PRIVATE)
    fillet3_piece_3 = split(fillet3_piece_3, bisect_by=Plane(origin=(14, 17.499999812, 6.035533751), z_dir=(0, 1, 0)), keep=Keep.TOP, mode=Mode.PRIVATE)
    with BuildSketch(Plane(origin=(5, 13.964565808, 6.035533751), x_dir=(0, -0.7071067502779134, -0.7071068120951804), z_dir=(0, 0.7071068120951804, -0.7071067502779134))) as fillet3_piece_4_section:
        with BuildLine():
            CenterArc((FILLET3_R, -FILLET3_R), FILLET3_R, 90, 90)
            Line((0, -FILLET3_R), (0, 0))
            Line((0, 0), (FILLET3_R, 0))
        make_face()
    fillet3_piece_4 = extrude(amount=10.353411969, mode=Mode.PRIVATE)
    fillet3_piece_4 = split(fillet3_piece_4, bisect_by=Plane(origin=(5, 17.499999812, 6.035533751), z_dir=(0, 1, 0)), keep=Keep.TOP, mode=Mode.PRIVATE)
    add([fillet3_piece_1, fillet3_piece_2, fillet3_piece_3, fillet3_piece_4], mode=Mode.SUBTRACT)


with BuildPart() as cut_extrude1_tool:
    # Sketch10 → Cut-Extrude1 (new body)
    with BuildSketch(Plane(origin=(0, -2.32e-07, 5.299197981), x_dir=(1, 0, 0), z_dir=(4.178627238637218e-15, -4.3711409000000035e-08, 0.9999999999999991))):
        with Locations(Location((4.876381667, 11.123618311, 0), (0, 0, 270))):
            Circle(SKETCH10_R)
        with Locations(Location((14.123618333, 4.876381853, 0), (0, 0, 270))):
            Circle(SKETCH10_R)
    extrude(amount=-CUT_EXTRUDE1_DEPTH)


with BuildPart() as part_3:
    add(part_2.part)

    # Cut-Extrude1: cut by cut_extrude1_tool, with a tolerance
    cut_extrude1_stock = TopTools_ListOfShape()
    cut_extrude1_stock.Append(part_3.part.wrapped)
    cut_extrude1_tools = TopTools_ListOfShape()
    cut_extrude1_tools.Append(cut_extrude1_tool.part.wrapped)
    cut_extrude1_cut = BRepAlgoAPI_Cut()
    cut_extrude1_cut.SetArguments(cut_extrude1_stock)
    cut_extrude1_cut.SetTools(cut_extrude1_tools)
    cut_extrude1_cut.SetFuzzyValue(0.00001)
    cut_extrude1_cut.Build()
    add(Compound.cast(cut_extrude1_cut.Shape()).solids(), mode=Mode.REPLACE)

    # Chamfer3
    chamfer3_edges = [part_3.edges().sort_by_distance(p)[0] for p in [
        (4.876381667, 12.623618145, 3.799198533),
        (14.123618333, 6.376381687, 3.799198259),
    ]]
    chamfer3_side = [part_3.faces().sort_by_distance(p)[0] for p in [
        (9.501935664, 8.001508451, 3.799199),
    ]]
    chamfer(chamfer3_edges, length=CHAMFER3_SIZE, length2=CHAMFER3_SIZE2, reference=chamfer3_side[0])


solid = part_3.part
